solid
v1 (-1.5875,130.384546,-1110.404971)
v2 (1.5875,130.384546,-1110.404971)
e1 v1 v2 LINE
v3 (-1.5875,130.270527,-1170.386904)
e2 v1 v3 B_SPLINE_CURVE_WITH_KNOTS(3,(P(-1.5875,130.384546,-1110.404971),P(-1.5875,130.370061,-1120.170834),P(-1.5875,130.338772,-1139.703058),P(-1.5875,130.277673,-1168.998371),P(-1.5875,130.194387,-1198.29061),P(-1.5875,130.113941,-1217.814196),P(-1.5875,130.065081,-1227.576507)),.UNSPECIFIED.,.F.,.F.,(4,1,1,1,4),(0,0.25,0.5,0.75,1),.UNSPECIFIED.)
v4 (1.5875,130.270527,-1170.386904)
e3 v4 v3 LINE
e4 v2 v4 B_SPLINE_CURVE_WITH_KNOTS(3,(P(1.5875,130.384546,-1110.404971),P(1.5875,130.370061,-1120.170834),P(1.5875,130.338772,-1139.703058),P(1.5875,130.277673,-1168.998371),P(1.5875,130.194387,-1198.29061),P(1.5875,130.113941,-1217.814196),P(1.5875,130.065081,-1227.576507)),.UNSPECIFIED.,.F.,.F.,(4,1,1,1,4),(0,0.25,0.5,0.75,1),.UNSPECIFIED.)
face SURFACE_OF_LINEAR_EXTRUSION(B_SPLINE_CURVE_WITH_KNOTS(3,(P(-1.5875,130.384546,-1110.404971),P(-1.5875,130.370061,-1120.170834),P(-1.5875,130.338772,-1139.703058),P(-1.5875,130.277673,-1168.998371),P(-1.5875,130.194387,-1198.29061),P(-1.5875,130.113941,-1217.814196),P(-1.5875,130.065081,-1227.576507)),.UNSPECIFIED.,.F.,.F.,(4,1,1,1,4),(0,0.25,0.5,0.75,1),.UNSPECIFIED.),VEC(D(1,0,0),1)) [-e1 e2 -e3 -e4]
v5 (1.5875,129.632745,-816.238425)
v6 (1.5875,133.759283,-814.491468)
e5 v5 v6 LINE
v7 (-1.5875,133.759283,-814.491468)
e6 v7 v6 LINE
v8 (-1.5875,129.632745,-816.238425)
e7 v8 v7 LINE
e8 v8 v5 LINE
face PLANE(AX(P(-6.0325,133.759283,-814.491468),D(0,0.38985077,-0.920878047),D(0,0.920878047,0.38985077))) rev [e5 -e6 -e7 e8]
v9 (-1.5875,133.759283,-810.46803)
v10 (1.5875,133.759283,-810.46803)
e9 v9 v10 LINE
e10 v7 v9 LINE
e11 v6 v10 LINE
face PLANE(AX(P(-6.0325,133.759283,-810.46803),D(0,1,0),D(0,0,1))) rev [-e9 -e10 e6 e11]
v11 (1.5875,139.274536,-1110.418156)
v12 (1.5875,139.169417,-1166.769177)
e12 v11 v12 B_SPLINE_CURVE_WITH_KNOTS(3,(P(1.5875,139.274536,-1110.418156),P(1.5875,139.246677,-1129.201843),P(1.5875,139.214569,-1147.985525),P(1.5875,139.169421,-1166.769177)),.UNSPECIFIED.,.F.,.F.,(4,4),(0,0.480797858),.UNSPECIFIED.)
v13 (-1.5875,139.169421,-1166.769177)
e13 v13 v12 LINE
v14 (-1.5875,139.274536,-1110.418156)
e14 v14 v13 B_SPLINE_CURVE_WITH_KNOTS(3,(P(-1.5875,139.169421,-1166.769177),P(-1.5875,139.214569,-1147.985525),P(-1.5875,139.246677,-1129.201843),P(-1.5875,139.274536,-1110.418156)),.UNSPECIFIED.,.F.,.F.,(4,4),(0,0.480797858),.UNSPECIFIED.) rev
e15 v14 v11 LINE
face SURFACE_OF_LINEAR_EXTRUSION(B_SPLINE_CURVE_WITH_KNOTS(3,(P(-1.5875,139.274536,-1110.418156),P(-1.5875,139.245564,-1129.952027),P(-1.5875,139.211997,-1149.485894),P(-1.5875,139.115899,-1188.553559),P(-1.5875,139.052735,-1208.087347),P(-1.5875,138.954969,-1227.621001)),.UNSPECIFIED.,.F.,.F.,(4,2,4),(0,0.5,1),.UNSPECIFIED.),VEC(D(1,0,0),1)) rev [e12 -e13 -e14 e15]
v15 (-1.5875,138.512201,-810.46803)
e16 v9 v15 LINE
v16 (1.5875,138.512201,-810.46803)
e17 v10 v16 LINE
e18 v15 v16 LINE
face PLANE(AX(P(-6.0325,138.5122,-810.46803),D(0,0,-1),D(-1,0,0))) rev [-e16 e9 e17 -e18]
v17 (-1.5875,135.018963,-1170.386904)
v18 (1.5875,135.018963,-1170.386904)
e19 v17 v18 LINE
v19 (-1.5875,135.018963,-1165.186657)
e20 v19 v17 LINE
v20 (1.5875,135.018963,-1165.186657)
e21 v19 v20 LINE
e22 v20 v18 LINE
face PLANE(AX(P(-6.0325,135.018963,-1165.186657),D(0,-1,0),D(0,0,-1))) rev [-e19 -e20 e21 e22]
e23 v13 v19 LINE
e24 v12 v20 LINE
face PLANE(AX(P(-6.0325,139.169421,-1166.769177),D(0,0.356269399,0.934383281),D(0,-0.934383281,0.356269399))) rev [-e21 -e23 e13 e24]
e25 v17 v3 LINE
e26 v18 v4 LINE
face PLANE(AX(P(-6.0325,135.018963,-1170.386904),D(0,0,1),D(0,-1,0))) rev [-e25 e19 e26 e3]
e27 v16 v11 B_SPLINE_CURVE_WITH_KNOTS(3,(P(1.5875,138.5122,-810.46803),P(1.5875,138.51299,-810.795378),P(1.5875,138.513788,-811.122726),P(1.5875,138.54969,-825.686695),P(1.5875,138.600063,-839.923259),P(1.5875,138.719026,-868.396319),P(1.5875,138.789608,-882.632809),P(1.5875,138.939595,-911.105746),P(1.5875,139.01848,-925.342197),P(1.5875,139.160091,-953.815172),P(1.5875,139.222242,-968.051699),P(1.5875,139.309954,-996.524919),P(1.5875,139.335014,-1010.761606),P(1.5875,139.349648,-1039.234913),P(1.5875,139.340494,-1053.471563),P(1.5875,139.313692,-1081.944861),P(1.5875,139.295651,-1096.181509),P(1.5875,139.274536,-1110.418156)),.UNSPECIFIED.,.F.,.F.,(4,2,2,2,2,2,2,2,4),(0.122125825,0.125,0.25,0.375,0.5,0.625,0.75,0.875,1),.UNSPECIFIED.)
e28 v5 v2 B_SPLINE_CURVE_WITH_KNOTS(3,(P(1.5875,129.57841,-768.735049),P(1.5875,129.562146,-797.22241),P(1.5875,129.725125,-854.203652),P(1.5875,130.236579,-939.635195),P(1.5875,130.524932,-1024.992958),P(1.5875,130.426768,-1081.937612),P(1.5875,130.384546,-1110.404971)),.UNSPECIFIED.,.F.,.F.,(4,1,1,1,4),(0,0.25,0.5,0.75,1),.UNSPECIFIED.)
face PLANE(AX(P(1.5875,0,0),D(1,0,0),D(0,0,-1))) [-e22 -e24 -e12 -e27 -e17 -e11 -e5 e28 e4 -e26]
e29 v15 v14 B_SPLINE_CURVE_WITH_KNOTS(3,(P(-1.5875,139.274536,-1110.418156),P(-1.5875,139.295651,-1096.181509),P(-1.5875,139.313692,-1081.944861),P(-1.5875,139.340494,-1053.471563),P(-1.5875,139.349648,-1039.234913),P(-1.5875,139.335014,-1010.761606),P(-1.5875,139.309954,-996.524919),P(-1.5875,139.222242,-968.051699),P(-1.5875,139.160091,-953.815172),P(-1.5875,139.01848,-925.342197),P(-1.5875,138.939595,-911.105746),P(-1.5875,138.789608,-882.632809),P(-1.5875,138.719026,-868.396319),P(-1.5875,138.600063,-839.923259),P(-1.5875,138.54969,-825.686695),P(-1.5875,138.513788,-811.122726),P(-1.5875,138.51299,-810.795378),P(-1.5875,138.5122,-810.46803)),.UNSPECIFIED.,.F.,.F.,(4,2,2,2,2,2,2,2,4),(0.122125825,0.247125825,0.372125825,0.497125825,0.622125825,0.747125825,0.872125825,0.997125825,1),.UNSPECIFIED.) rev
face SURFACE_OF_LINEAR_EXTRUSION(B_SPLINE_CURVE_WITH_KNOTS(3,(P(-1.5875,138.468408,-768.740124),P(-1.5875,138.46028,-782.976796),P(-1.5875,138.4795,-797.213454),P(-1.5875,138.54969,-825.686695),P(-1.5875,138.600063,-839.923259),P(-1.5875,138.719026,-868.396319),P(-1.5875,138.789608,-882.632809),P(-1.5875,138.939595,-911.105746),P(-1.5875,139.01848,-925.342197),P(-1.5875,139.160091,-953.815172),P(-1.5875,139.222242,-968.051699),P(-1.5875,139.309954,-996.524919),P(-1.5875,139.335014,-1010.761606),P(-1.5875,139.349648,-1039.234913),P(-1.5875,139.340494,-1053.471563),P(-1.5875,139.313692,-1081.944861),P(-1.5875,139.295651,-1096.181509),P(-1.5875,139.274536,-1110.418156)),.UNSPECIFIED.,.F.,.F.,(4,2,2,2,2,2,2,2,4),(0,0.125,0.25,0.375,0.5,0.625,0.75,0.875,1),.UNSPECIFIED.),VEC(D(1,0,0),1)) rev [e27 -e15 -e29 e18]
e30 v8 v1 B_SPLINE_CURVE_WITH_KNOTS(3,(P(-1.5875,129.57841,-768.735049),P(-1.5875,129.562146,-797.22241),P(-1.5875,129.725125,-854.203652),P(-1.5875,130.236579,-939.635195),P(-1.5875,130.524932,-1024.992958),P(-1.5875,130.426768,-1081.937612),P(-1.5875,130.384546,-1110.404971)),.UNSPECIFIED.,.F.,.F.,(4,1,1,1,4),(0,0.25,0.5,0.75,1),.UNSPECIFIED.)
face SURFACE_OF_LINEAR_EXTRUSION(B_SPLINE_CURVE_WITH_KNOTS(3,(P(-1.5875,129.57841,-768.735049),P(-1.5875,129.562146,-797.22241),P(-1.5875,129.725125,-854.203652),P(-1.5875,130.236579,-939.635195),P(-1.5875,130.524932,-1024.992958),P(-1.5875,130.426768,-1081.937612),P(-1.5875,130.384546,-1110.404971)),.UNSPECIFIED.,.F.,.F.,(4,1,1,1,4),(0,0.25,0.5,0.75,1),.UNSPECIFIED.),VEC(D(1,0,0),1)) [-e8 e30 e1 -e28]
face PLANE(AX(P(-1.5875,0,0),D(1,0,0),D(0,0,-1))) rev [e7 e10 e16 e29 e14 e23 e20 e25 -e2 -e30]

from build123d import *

# Parameters (mm, degrees)
BOSS_EXTRUDE1_START = -1.5875
BOSS_EXTRUDE1_DEPTH = 3.175
FILLET1_R           = 2.54
CUT_EXTRUDE1_DEPTH  = 2674.191025632
FILLET2_R           = 0.762
FILLET3_R           = 0.762
CUT_EXTRUDE2_DEPTH  = 7.62


with BuildPart() as part:
    # Boss-Extrude1: read off the stored shape, not the designer's step
    # Boss-Extrude1 outline → Boss-Extrude1 (new body)
    with BuildSketch(Plane(origin=(0, 0, 0), x_dir=(0, 0, -1), z_dir=(1, 0, 0)).offset(BOSS_EXTRUDE1_START)):
        with BuildLine():
            add(Edge.make_bspline(
                [(1110.404970926, 130.384545774), (1120.170834465, 130.370061323), (1139.703057908, 130.338772026), (1168.998370974, 130.277673039), (1198.290610395, 130.194386876), (1217.81419633, 130.113940836), (1227.576506903, 130.06508052)],
                knots=[0, 0, 0, 0, 0.25, 0.5, 0.75, 1, 1, 1, 1], degree=3))
            add(Edge.make_bspline(
                [(1227.576506903, 130.06508052), (1269.911205773, 129.853195249), (1333.427746701, 129.273373321), (1418.042208161, 127.449050563), (1502.665994832, 124.913583682), (1608.454176987, 120.803299479), (1693.070073331, 116.848243245), (1735.369787733, 114.744712179)],
                knots=[0, 0, 0, 0, 0.25, 0.375, 0.5, 0.75, 1, 1, 1, 1], degree=3))
            add(Edge.make_bspline(
                [(1735.369787733, 114.744712179), (1815.995940723, 110.735232018), (1936.906650462, 104.096364548), (2098.049485168, 94.18797875), (2198.694736725, 87.314638509), (2279.130413747, 81.114418931), (2339.412950304, 76.034076608), (2399.564054334, 70.28270545), (2479.570468264, 61.127378254), (2559.292087872, 49.650907614), (2626.797554585, 38.235484735), (2656.889518578, 32.788503969), (2667.159793662, 30.877771266), (2669.54, 30.432069924)],
                knots=[0, 0, 0, 0, 0.25, 0.375, 0.5, 0.5625, 0.625, 0.6875, 0.75, 0.875, 0.9375, 0.96241067, 0.969928536, 0.969928536, 0.969928536, 0.969928536], degree=3))
            Line((2669.54, 30.432069924), (2669.54, 39.476142465))
            add(Edge.make_bspline(
                [(1735.811334709, 123.623740069), (1776.138635499, 121.618292624), (1816.460281579, 119.500621806), (1897.093668675, 115.087561885), (1937.405638896, 112.792971084), (2018.018419045, 108.018366523), (2058.319512223, 105.539122976), (2138.903780144, 100.307240032), (2179.18739793, 97.555127955), (2239.586998714, 93.080168687), (2259.716280977, 91.529837622), (2289.900442602, 89.09084343), (2299.960179135, 88.258845039), (2320.076004566, 86.552861654), (2330.132100898, 85.678962223), (2350.239356518, 83.874334847), (2360.290489794, 82.943307484), (2380.385973971, 81.003183297), (2390.430065378, 79.993418555), (2420.547026195, 76.827577532), (2440.60648589, 74.533672955), (2480.675569568, 69.556278523), (2500.68715183, 66.874150811), (2540.654290207, 61.150246295), (2560.611026428, 58.109755646), (2600.475457131, 51.702465574), (2620.382967089, 48.337538888), (2650.028116889, 43.072156367), (2659.78844051, 41.29687683), (2669.54, 39.476142465)],
                knots=[0, 0, 0, 0, 0.125, 0.125, 0.25, 0.25, 0.375, 0.375, 0.5, 0.5, 0.5625, 0.5625, 0.59375, 0.59375, 0.625, 0.625, 0.65625, 0.65625, 0.6875, 0.6875, 0.75, 0.75, 0.8125, 0.8125, 0.875, 0.875, 0.9375, 0.9375, 0.968210768, 0.968210768, 0.968210768, 0.968210768], degree=3))
            add(Edge.make_bspline(
                [(1227.621000751, 138.954969175), (1248.807303679, 138.848931677), (1269.993583155, 138.701170252), (1312.363832348, 138.270664618), (1333.547719008, 137.987407832), (1375.912368189, 137.249274813), (1397.09309738, 136.7925677), (1439.451328259, 135.701855835), (1460.629010312, 135.069210584), (1502.979101161, 133.670541385), (1524.152152736, 132.907434339), (1566.494303759, 131.284732459), (1587.663166024, 130.423163385), (1651.164052809, 127.709123983), (1693.490421561, 125.728325331), (1735.811334709, 123.623740069)],
                knots=[0, 0, 0, 0, 0.125, 0.125, 0.25, 0.25, 0.375, 0.375, 0.5, 0.5, 0.625, 0.625, 0.75, 0.75, 1, 1, 1, 1], degree=3))
            add(Edge.make_bspline(
                [(1110.418156307, 139.274535996), (1129.952027249, 139.245563914), (1149.485893504, 139.211997476), (1188.553558893, 139.115899087), (1208.087346834, 139.052735015), (1227.621000751, 138.954969175)],
                knots=[0, 0, 0, 0, 0.5, 0.5, 1, 1, 1, 1], degree=3))
            add(Edge.make_bspline(
                [(768.740124165, 138.468408213), (782.976796045, 138.460280143), (797.213453801, 138.479500079), (825.686695051, 138.549690296), (839.923258916, 138.600062665), (868.396318956, 138.719026333), (882.632808962, 138.789607972), (911.105746117, 138.939594729), (925.342197007, 139.018479563), (953.81517223, 139.160090703), (968.051699178, 139.222241505), (996.524919377, 139.30995407), (1010.761605517, 139.335014039), (1039.234912871, 139.349647552), (1053.471562869, 139.340493535), (1081.944860968, 139.313691902), (1096.181508981, 139.29565137), (1110.418156307, 139.274535996)],
                knots=[0, 0, 0, 0, 0.125, 0.125, 0.25, 0.25, 0.375, 0.375, 0.5, 0.5, 0.625, 0.625, 0.75, 0.75, 0.875, 0.875, 1, 1, 1, 1], degree=3))
            add(Edge.make_bspline(
                [(630.778432202, 139.251437536), (653.771819614, 139.075315664), (676.765000849, 138.871740519), (711.255349111, 138.647690701), (722.752238945, 138.586174182), (745.746099074, 138.499784896), (757.243084259, 138.474972158), (768.740124165, 138.468408213)],
                knots=[0, 0, 0, 0, 0.5, 0.5, 0.75, 0.75, 1, 1, 1, 1], degree=3))
            add(Edge.make_bspline(
                [(604.514984259, 139.433685568), (609.940743136, 139.400696354), (618.695242427, 139.342071397), (627.449694696, 139.276935028), (630.778432202, 139.251437536)],
                knots=[0, 0, 0, 0, 0.619765686, 1, 1, 1, 1], degree=3))
            ThreePointArc((604.514984259, 139.433685568), (600.549356142, 139.457173081), (596.583720644, 139.479379304))
            add(Edge.make_bspline(
                [(436.133018826, 139.357176562), (449.50393779, 139.390650739), (462.874888934, 139.412366015), (489.61665939, 139.498555977), (502.987497127, 139.559076553), (529.729299233, 139.628029754), (543.100240501, 139.639230481), (569.84212102, 139.601013959), (583.212960696, 139.552035302), (596.583720644, 139.479379304)],
                knots=[0, 0, 0, 0, 0.25, 0.25, 0.5, 0.5, 0.75, 0.75, 1, 1, 1, 1], degree=3))
            add(Edge.make_bspline(
                [(432.263917423, 139.347117104), (433.553617637, 139.350567112), (434.843318039, 139.353947814), (436.133018826, 139.357176562)],
                knots=[0, 0, 0, 0, 1, 1, 1, 1], degree=3))
            add(Edge.make_bspline(
                [(420.316232014, 139.305761868), (422.413235913, 139.315186344), (426.395793967, 139.330351666), (430.378363115, 139.342073082), (432.263917423, 139.347117104)],
                knots=[0, 0, 0, 0, 0.526548575, 1, 1, 1, 1], degree=3))
            add(Edge.make_bspline(
                [(376.410119779, 138.75403864), (383.726317086, 138.935561778), (391.043801196, 139.055611797), (405.679602634, 139.224192856), (412.997895507, 139.272871444), (420.316232014, 139.305761868)],
                knots=[0, 0, 0, 0, 0.5, 0.5, 1, 1, 1, 1], degree=3))
            add(Edge.make_bspline(
                [(336.49221538, 137.002990798), (349.782924989, 137.88646357), (363.094318653, 138.423658969), (376.410119779, 138.75403864)],
                knots=[0, 0, 0, 0, 1, 1, 1, 1], degree=3))
            add(Edge.make_bspline(
                [(322.369488076, 135.928469458), (327.073374868, 136.333386449), (331.781331813, 136.689844531), (336.49221538, 137.002990798)],
                knots=[0, 0, 0, 0, 1, 1, 1, 1], degree=3))
            add(Edge.make_bspline(
                [(269.769949315, 129.47895505), (274.123387467, 130.231879276), (278.485668028, 130.925946417), (287.22796256, 132.196043087), (291.608626646, 132.771988738), (300.381777496, 133.818422146), (304.774579419, 134.288963443), (313.567800313, 135.154375086), (317.967903853, 135.549407043), (322.369488076, 135.928469458)],
                knots=[0, 0, 0, 0, 0.25, 0.25, 0.5, 0.5, 0.75, 0.75, 1, 1, 1, 1], degree=3))
            add(Edge.make_bspline(
                [(135.15718457, 90.054634926), (146.043739673, 94.375230064), (156.99891695, 98.504335222), (173.56622243, 104.322560697), (179.110932848, 106.199810145), (190.24859245, 109.819698901), (195.841545849, 111.562316625), (207.065472514, 114.901345648), (212.697969124, 116.49836249), (224.005973618, 119.540534541), (229.683240596, 120.9862349), (246.767187276, 125.077694043), (258.225188059, 127.482295924), (269.769949315, 129.47895505)],
                knots=[0, 0, 0, 0, 0.25, 0.25, 0.375, 0.375, 0.5, 0.5, 0.625, 0.625, 0.75, 0.75, 1, 1, 1, 1], degree=3))
            add(Edge.make_bspline(
                [(107.049744533, 78.466050261), (116.373258882, 82.438606419), (125.737350123, 86.316143859), (135.15718457, 90.054634926)],
                knots=[0, 0, 0, 0, 1, 1, 1, 1], degree=3))
            add(Edge.make_bspline(
                [(99.06, 75.03568963), (99.223542669, 75.106424562), (100.635498802, 75.716852689), (103.297453866, 76.863328103), (105.798503999, 77.932922637), (107.049744533, 78.466050261)],
                knots=[0.484151133, 0.484151133, 0.484151133, 0.484151133, 0.515864471, 0.757931449, 1, 1, 1, 1], degree=3))
            Line((99.06, 75.03568963), (99.06, 65.345043949))
            add(Edge.make_bspline(
                [(99.06, 65.345043949), (99.380370965, 65.484464523), (100.637671455, 66.031176319), (103.17753745, 67.132002814), (106.681577323, 68.64166857), (109.249580285, 69.740028797), (110.534459652, 70.287489229)],
                knots=[0.254738807, 0.254738807, 0.254738807, 0.254738807, 0.317238807, 0.5, 0.75, 1, 1, 1, 1], degree=3))
            add(Edge.make_bspline(
                [(110.534459652, 70.287489229), (112.850658013, 71.274373329), (117.489277519, 73.236837099), (124.456688526, 76.138068453), (131.438476528, 78.994265342), (136.101204469, 80.864754132), (138.436571012, 81.791601309)],
                knots=[0, 0, 0, 0, 0.25, 0.5, 0.75, 1, 1, 1, 1], degree=3))
            add(Edge.make_bspline(
                [(138.436571012, 81.791601309), (143.826897197, 83.930883835), (154.6522834, 88.11877139), (176.408203186, 96.037596764), (203.906835742, 104.998187521), (237.39469787, 114.027149543), (259.934818065, 118.755998441), (271.284977744, 120.719001348)],
                knots=[0, 0, 0, 0, 0.125, 0.25, 0.5, 0.75, 1, 1, 1, 1], degree=3))
            add(Edge.make_bspline(
                [(271.284977744, 120.719001348), (275.558711595, 121.458140765), (284.124297478, 122.821139095), (297.036360548, 124.518896272), (310.018420247, 125.909880891), (318.766623126, 126.695286194), (323.13209925, 127.071239405)],
                knots=[5e-09, 5e-09, 5e-09, 5e-09, 0.2499992, 0.4999984, 0.7499976, 0.999996801, 0.999996801, 0.999996801, 0.999996801], degree=3))
            add(Edge.make_bspline(
                [(323.13209925, 127.071239405), (324.293050056, 127.171175344), (326.615168427, 127.365043892), (330.101568176, 127.638529754), (333.590184216, 127.895089457), (335.917953069, 128.055198639), (337.081858513, 128.132566852)],
                knots=[1.2024e-05, 1.2024e-05, 1.2024e-05, 1.2024e-05, 0.250009018, 0.500006012, 0.750003006, 1, 1, 1, 1], degree=3))
            add(Edge.make_bspline(
                [(337.081858513, 128.132566852), (340.367862287, 128.350997241), (346.939906877, 128.744909116), (356.821319657, 129.221190111), (366.716250393, 129.595096292), (373.326613137, 129.784797569), (376.630622597, 129.866773678)],
                knots=[0, 0, 0, 0, 0.25, 0.5, 0.75, 1, 1, 1, 1], degree=3))
            add(Edge.make_bspline(
                [(376.630622597, 129.866773678), (380.266394474, 129.956981294), (387.534764147, 130.106779908), (398.462206547, 130.259361028), (409.400972015, 130.358727994), (416.705417778, 130.39944419), (420.356185481, 130.415851648)],
                knots=[0, 0, 0, 0, 0.25, 0.5, 0.75, 1, 1, 1, 1], degree=3))
            add(Edge.make_bspline(
                [(420.356185481, 130.415851648), (421.350045129, 130.420318309), (423.337533562, 130.428603137), (426.320174328, 130.439402209), (429.303468332, 130.448883952), (431.293011648, 130.454488038), (432.287698861, 130.457148912)],
                knots=[0, 0, 0, 0, 0.25, 0.5, 0.75, 1, 1, 1, 1], degree=3))
            add(Edge.make_bspline(
                [(432.287698861, 130.457148912), (432.610032304, 130.45801117), (433.254717136, 130.45972707), (434.221637716, 130.462266911), (435.188505114, 130.464765142), (435.833012253, 130.466397641), (436.155274747, 130.46720442)],
                knots=[9.2e-08, 9.2e-08, 9.2e-08, 9.2e-08, 0.25, 0.5, 0.75, 1, 1, 1, 1], degree=3))
            add(Edge.make_bspline(
                [(436.155274747, 130.46720442), (449.528322363, 130.500683927), (476.275740382, 130.546633815), (516.38896029, 130.728798697), (556.456290895, 130.759667498), (583.176533448, 130.662101975), (596.535396133, 130.589510646)],
                knots=[0, 0, 0, 0, 0.249999973, 0.499999946, 0.749999918, 0.999999891, 0.999999891, 0.999999891, 0.999999891], degree=3))
            ThreePointArc((596.535396133, 130.589510646), (600.498158983, 130.567320504), (604.460914457, 130.543849998))
            add(Edge.make_bspline(
                [(604.460914457, 130.543849998), (606.648150431, 130.530551362), (611.022503017, 130.502867011), (617.584689429, 130.458405465), (624.147187284, 130.411339888), (628.522663802, 130.378455494), (630.7103385, 130.361698324)],
                knots=[-7.09e-07, -7.09e-07, -7.09e-07, -7.09e-07, 0.249999468, 0.499999646, 0.749999823, 1, 1, 1, 1], degree=3))
            add(Edge.make_bspline(
                [(630.7103385, 130.361698324), (642.206126489, 130.273644326), (665.193556095, 130.083785311), (699.699077953, 129.819212193), (734.21504011, 129.634735151), (757.228597075, 129.58497898), (768.735048644, 129.578409662)],
                knots=[0, 0, 0, 0, 0.25, 0.5, 0.75, 1, 1, 1, 1], degree=3))
            add(Edge.make_bspline(
                [(768.735048644, 129.578409662), (797.222409768, 129.56214552), (854.203652026, 129.725124503), (939.635195481, 130.236578518), (1024.992958464, 130.524931921), (1081.937612336, 130.426767717), (1110.404970926, 130.384545774)],
                knots=[0, 0, 0, 0, 0.25, 0.5, 0.75, 1, 1, 1, 1], degree=3))
        make_face()
    extrude(amount=BOSS_EXTRUDE1_DEPTH)

    # Fillet1
    fillet1_edges = [part.edges().sort_by_distance(p)[0] for p in [
        (0, 39.476142465, -2669.54),
        (0, 30.432069924, -2669.54),
        (0, 65.345043949, -99.06),
        (0, 75.03568963, -99.06),
    ]]
    fillet(fillet1_edges, radius=FILLET1_R)

    # Sketch4 → Cut-Extrude1 (cut, through all)
    with BuildSketch(Plane(origin=(1.5875, 0, 0), x_dir=(0, 0, -1), z_dir=(1, 0, 0))):
        Polygon((1827.2125, 118.895836595), (1827.2125, 110.000384115), (1827.2125, 78.791710134), (2135.1875, 78.791710134), (2135.1875, 91.599357392), (2135.1875, 100.508307819), (2135.1875, 129.353842083), (1827.2125, 129.353842083), align=None)
    extrude(amount=-CUT_EXTRUDE1_DEPTH, mode=Mode.SUBTRACT)


with BuildPart() as cut_extrude1_piece_1:
    # of the separate pieces the step leaves, piece 1, a body of its own (cut_extrude1_pieces)
    add(part.part.solids().sort_by_distance((-1.5875, 114.744712179, -1735.369787733))[0])

    # Fillet2
    fillet2_edges = [cut_extrude1_piece_1.edges().sort_by_distance(p)[0] for p in [
        (0, 118.895836595, -1827.2125),
        (0, 110.000384116, -1827.2125),
    ]]
    fillet(fillet2_edges, radius=FILLET2_R)


with BuildPart() as cut_extrude1_piece_2:
    # of the separate pieces the step leaves, piece 2, a body of its own (cut_extrude1_pieces)
    add(part.part.solids().sort_by_distance((-1.5875, 91.599357392, -2135.1875))[0])

    # Fillet3
    fillet3_edges = [cut_extrude1_piece_2.edges().sort_by_distance(p)[0] for p in [
        (0, 100.508307819, -2135.1875),
        (0, 91.599357392, -2135.1875),
    ]]
    fillet(fillet3_edges, radius=FILLET3_R)


with BuildPart() as cut_extrude2_tool:
    # Sketch5 → Cut-Extrude2 (new body)
    with BuildSketch(Plane(origin=(1.5875, 0, 0), x_dir=(0, 0, -1), z_dir=(1, 0, 0))):
        Polygon((810.468029574, 138.512199639), (810.468029574, 133.759282778), (814.491468237, 133.759282778), (816.238424635, 129.632745348), (816.238424635, 106.608138071), (55.182537973, 0), (26.685618653, 153.088449224), (810.468029574, 153.088449224), align=None)
        Polygon((1166.769177473, 139.169420645), (1165.186656638, 135.018963115), (1170.386904229, 135.018963115), (1170.386904229, 130.270526743), (1170.386904229, 114.196578451), (2691.040068031, -74.953739753), (2732.471219555, 153.088449224), (1166.769177473, 153.088449224), align=None)
    extrude(amount=-CUT_EXTRUDE2_DEPTH)


with BuildPart() as cut_extrude1_piece_1_1:
    add(cut_extrude1_piece_1.part)

    # Cut-Extrude2: cut by cut_extrude2_tool
    add(cut_extrude2_tool.part, mode=Mode.SUBTRACT)


with BuildPart() as cut_extrude1_piece_2_1:
    add(cut_extrude1_piece_2.part)

    # Cut-Extrude2: cut by cut_extrude2_tool
    add(cut_extrude2_tool.part, mode=Mode.SUBTRACT)


solid = cut_extrude1_piece_1_1.part
